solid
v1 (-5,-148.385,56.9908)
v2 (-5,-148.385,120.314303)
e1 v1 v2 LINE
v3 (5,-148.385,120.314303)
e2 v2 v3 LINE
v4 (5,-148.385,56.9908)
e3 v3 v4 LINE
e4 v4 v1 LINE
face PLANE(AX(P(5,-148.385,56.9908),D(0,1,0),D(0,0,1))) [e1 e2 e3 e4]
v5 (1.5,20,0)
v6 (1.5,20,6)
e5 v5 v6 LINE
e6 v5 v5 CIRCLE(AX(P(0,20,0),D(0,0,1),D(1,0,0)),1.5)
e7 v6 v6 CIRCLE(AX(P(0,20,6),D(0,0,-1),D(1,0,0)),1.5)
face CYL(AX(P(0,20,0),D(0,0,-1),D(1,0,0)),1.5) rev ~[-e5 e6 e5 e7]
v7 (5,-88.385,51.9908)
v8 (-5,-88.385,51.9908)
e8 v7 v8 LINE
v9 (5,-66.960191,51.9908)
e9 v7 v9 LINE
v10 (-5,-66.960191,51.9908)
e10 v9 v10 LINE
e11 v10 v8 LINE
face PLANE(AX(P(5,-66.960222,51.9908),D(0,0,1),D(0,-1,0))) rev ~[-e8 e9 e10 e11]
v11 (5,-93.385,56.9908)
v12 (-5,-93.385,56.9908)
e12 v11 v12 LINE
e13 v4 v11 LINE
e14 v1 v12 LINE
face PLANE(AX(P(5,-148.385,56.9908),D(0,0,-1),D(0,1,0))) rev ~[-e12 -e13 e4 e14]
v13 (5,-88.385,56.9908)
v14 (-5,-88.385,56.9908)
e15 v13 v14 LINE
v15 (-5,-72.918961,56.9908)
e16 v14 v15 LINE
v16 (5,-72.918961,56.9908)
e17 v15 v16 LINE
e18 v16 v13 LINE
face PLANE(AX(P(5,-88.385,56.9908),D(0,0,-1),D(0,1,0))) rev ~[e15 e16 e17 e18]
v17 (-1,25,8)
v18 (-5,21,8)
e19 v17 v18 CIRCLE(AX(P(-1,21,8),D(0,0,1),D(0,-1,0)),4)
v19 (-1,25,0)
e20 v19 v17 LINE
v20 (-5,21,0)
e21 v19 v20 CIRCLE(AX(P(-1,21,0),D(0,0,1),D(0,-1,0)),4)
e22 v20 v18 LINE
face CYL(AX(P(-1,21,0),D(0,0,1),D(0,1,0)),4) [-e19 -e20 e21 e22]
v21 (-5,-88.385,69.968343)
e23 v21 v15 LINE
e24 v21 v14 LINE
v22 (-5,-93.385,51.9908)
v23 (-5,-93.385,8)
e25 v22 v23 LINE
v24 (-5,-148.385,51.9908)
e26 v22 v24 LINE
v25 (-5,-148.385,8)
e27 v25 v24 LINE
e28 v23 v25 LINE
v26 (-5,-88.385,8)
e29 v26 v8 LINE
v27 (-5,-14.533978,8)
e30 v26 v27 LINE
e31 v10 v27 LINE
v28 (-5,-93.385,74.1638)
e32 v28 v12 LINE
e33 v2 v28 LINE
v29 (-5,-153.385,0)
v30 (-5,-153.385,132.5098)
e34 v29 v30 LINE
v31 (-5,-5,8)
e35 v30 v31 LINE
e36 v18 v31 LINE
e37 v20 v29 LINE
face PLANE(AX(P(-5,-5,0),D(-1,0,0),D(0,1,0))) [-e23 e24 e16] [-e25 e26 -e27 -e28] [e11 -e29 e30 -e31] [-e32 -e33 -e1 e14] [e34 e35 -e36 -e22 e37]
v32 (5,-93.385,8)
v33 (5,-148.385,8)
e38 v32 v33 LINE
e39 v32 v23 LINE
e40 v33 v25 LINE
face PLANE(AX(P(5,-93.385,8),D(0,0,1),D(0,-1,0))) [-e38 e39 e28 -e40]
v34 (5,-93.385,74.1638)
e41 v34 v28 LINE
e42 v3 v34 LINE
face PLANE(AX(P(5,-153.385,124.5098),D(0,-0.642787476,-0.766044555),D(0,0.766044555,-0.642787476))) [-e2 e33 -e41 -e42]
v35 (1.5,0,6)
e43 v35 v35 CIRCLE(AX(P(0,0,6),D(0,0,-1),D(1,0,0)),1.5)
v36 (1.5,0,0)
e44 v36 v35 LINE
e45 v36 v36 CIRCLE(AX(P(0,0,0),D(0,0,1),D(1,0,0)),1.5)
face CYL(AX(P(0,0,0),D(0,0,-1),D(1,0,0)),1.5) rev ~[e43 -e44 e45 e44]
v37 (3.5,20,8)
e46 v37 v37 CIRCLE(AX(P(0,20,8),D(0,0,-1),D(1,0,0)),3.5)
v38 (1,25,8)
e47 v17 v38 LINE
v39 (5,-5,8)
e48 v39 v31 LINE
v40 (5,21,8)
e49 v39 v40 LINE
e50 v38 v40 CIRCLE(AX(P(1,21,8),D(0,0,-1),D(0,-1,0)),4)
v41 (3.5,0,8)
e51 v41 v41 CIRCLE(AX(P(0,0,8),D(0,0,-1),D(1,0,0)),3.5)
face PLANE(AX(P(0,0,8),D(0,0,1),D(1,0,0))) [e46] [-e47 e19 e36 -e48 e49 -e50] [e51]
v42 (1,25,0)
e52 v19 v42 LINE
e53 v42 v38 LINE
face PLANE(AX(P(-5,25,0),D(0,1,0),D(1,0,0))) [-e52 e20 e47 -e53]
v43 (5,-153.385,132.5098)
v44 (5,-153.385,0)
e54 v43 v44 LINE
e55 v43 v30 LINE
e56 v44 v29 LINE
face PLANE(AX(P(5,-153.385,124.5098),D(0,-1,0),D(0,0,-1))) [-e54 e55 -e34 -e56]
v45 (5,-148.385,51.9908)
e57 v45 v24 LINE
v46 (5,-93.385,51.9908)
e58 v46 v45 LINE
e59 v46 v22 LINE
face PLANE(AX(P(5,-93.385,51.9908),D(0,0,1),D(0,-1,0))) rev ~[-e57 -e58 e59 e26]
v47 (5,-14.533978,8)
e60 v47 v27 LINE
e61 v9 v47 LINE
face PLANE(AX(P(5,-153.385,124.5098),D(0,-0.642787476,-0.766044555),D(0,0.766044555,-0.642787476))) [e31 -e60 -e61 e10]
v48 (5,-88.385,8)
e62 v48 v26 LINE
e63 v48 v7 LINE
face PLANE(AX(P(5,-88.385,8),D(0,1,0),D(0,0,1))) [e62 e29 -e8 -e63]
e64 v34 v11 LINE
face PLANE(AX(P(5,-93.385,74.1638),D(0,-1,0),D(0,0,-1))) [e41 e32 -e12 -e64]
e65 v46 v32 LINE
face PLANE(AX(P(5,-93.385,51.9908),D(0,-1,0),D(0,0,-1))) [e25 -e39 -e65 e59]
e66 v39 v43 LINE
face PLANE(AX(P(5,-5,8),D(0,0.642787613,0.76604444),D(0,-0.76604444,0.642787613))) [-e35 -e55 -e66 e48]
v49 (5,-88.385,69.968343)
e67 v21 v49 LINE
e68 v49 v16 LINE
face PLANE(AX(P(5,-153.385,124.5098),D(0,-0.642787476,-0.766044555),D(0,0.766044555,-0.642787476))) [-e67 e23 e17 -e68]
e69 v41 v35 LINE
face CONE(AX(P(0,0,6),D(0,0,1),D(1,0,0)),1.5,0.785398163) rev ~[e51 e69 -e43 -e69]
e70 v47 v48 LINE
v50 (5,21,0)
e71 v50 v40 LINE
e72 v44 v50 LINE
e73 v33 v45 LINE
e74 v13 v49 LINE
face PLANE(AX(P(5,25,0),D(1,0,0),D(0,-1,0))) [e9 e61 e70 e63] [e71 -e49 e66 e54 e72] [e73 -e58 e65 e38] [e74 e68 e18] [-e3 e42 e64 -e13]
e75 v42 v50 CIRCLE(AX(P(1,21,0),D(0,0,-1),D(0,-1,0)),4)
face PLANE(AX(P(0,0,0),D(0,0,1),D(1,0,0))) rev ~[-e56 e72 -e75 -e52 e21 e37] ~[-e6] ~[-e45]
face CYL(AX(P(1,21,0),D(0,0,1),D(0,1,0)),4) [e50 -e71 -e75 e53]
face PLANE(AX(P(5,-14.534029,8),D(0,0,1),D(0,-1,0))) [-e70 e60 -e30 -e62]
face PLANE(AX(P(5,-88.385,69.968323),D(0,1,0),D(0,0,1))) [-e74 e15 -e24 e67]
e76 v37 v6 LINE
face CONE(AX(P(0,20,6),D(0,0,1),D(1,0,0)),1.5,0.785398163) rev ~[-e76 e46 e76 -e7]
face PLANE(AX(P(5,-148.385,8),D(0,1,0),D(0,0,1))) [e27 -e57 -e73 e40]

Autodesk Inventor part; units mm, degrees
ref_plane "YZ Plane" through (0, 0, 0) normal (1, 0, 0) x (0, 1, 0)
ref_plane "XZ Plane" through (0, 0, 0) normal (0, 1, 0) x (-1, 0, 0)
ref_plane "XY Plane" through (0, 0, 0) normal (0, 0, 1) x (1, 0, 0)
sketch "Sketch1" plane through (0, 0, 0) normal (0, 0, 1) x (1, 0, 0)
  line L0 (0, 0) -> (0, 20)
  circle A0 centre (0, 20) radius 1.5
  circle A1 centre (0, 0) radius 1.5
  line L1 (-5, 25) -> (5, 25)
  line L2 (5, 25) -> (5, -5)
  line L3 (5, -5) -> (-5, -5)
  line L4 (-5, -5) -> (-5, 25)
  dimension "d0" = 20
  dimension "d1" = 3
  dimension "d2" = 3
  dimension "d3" = 5
  dimension "d4" = 5
  dimension "d5" = 10
  dimension "d6" = 5
extrude "Extrusion1" add sketch "Sketch1" along normal blind 8
sketch "Sketch2" plane through (5, -5, 0) normal (1, 0, 0) x (0, 0, -1)
  line L0 (-8, 0) -> (-132.5098, -148.385)
  line L1 (-132.5098, -148.385) -> (-124.5098, -148.385)
  line L2 (-124.5098, -148.385) -> (1.3551, 1.615)
  line L3 (-8, 0) -> (-8, 30) projected
  line L4 (0, 0) -> (0, 30) projected
  line L5 (0, 30) -> (-8, 30) projected
  line L6 (-8, 0) -> (-8, 30) projected
  line L7 (0, 0) -> (-8, 0) projected
  point P0 (0, 5)
  point P1 (0, 0)
  dimension "d9" = 8
  dimension "d10" = 140
  dimension "d11" = 150
extrude "Extrusion2" add sketch "Sketch2" against normal up to surface (10 mm away) contours L7 L2 L1 L0
chamfer "Chamfer1" distance 2 angle 45 2 edges at (-1.5, 20, 8) (-1.5, 0, 8)
fillet "Fillet1" radius 4 2 edges at (5, 25, 4) (-5, 25, 4)
sketch "Sketch3" plane through (5, -153.385, 132.5098) normal (1, 0, 0) x (0, 0, -1)
  line L0 (0, 0) -> (8, 0) projected
  line L1 (8, 0) -> (132.5098, 0)
  line L2 (132.5098, 0) -> (132.5098, 5)
  line L3 (132.5098, 5) -> (8, 5)
  line L4 (8, 5) -> (8, 0)
  line L5 (132.5098, 148.6932) -> (124.5098, 148.6932)
  line L6 (124.5098, 148.6932) -> (124.5098, 0)
  line L7 (124.5098, 0) -> (132.5098, 0)
  line L8 (132.5098, 0) -> (132.5098, 148.6932)
  line L9 (124.5098, 148.385) -> (124.5098, 174.385) projected
  line L10 (124.5098, 148.385) -> (0, 0) projected
  line L11 (75.519, 90) -> (80.519, 90)
  line L12 (80.519, 90) -> (80.519, 0)
  line L13 (80.519, 0) -> (75.519, 0)
  line L14 (75.519, 0) -> (75.519, 90)
  line L15 (8, 0) -> (132.5098, 148.385) projected
  line L16 (132.5098, 65) -> (58.346, 65)
  line L17 (58.346, 65) -> (58.346, 60)
  line L18 (58.346, 60) -> (132.5098, 60)
  line L19 (132.5098, 60) -> (132.5098, 65)
  point P0 (132.5098, 153.385)
  point P1 (132.5098, 5)
  point P2 (124.5098, 5)
  point P3 (80.519, 5)
  point P4 (75.519, 5)
  point P5 (80.519, 60)
  point P6 (124.5098, 60)
  point P7 (124.5098, 65)
  point P8 (80.519, 65)
  point P9 (75.519, 60)
  point P10 (75.519, 65)
  dimension "d18" = 5
  dimension "d19" = 5
  dimension "d20" = 90
  dimension "d23" = 5
  dimension "d24" = 55
extrude "Extrusion3" add sketch "Sketch3" against normal blind 10 contours L15 L3 L14 L1 | L4 L3 L15 | L11 L12 L15 L14 | L14 L3 L12 L1 | L6 L5 L8 L15 | L15 L12 L16 L14 | L12 L3 L6 L1 | L14 L18 L12 L3 | L17 L16 L15 | L15 L16 L14 L18 | L15 L8 L16 L6 | L16 L12 L18 L14 | L6 L3 L2 L1 | L16 L8 L18 L6 | L6 L18 L12 L16 | L6 L18 L8 L3
properties part number "legs"
